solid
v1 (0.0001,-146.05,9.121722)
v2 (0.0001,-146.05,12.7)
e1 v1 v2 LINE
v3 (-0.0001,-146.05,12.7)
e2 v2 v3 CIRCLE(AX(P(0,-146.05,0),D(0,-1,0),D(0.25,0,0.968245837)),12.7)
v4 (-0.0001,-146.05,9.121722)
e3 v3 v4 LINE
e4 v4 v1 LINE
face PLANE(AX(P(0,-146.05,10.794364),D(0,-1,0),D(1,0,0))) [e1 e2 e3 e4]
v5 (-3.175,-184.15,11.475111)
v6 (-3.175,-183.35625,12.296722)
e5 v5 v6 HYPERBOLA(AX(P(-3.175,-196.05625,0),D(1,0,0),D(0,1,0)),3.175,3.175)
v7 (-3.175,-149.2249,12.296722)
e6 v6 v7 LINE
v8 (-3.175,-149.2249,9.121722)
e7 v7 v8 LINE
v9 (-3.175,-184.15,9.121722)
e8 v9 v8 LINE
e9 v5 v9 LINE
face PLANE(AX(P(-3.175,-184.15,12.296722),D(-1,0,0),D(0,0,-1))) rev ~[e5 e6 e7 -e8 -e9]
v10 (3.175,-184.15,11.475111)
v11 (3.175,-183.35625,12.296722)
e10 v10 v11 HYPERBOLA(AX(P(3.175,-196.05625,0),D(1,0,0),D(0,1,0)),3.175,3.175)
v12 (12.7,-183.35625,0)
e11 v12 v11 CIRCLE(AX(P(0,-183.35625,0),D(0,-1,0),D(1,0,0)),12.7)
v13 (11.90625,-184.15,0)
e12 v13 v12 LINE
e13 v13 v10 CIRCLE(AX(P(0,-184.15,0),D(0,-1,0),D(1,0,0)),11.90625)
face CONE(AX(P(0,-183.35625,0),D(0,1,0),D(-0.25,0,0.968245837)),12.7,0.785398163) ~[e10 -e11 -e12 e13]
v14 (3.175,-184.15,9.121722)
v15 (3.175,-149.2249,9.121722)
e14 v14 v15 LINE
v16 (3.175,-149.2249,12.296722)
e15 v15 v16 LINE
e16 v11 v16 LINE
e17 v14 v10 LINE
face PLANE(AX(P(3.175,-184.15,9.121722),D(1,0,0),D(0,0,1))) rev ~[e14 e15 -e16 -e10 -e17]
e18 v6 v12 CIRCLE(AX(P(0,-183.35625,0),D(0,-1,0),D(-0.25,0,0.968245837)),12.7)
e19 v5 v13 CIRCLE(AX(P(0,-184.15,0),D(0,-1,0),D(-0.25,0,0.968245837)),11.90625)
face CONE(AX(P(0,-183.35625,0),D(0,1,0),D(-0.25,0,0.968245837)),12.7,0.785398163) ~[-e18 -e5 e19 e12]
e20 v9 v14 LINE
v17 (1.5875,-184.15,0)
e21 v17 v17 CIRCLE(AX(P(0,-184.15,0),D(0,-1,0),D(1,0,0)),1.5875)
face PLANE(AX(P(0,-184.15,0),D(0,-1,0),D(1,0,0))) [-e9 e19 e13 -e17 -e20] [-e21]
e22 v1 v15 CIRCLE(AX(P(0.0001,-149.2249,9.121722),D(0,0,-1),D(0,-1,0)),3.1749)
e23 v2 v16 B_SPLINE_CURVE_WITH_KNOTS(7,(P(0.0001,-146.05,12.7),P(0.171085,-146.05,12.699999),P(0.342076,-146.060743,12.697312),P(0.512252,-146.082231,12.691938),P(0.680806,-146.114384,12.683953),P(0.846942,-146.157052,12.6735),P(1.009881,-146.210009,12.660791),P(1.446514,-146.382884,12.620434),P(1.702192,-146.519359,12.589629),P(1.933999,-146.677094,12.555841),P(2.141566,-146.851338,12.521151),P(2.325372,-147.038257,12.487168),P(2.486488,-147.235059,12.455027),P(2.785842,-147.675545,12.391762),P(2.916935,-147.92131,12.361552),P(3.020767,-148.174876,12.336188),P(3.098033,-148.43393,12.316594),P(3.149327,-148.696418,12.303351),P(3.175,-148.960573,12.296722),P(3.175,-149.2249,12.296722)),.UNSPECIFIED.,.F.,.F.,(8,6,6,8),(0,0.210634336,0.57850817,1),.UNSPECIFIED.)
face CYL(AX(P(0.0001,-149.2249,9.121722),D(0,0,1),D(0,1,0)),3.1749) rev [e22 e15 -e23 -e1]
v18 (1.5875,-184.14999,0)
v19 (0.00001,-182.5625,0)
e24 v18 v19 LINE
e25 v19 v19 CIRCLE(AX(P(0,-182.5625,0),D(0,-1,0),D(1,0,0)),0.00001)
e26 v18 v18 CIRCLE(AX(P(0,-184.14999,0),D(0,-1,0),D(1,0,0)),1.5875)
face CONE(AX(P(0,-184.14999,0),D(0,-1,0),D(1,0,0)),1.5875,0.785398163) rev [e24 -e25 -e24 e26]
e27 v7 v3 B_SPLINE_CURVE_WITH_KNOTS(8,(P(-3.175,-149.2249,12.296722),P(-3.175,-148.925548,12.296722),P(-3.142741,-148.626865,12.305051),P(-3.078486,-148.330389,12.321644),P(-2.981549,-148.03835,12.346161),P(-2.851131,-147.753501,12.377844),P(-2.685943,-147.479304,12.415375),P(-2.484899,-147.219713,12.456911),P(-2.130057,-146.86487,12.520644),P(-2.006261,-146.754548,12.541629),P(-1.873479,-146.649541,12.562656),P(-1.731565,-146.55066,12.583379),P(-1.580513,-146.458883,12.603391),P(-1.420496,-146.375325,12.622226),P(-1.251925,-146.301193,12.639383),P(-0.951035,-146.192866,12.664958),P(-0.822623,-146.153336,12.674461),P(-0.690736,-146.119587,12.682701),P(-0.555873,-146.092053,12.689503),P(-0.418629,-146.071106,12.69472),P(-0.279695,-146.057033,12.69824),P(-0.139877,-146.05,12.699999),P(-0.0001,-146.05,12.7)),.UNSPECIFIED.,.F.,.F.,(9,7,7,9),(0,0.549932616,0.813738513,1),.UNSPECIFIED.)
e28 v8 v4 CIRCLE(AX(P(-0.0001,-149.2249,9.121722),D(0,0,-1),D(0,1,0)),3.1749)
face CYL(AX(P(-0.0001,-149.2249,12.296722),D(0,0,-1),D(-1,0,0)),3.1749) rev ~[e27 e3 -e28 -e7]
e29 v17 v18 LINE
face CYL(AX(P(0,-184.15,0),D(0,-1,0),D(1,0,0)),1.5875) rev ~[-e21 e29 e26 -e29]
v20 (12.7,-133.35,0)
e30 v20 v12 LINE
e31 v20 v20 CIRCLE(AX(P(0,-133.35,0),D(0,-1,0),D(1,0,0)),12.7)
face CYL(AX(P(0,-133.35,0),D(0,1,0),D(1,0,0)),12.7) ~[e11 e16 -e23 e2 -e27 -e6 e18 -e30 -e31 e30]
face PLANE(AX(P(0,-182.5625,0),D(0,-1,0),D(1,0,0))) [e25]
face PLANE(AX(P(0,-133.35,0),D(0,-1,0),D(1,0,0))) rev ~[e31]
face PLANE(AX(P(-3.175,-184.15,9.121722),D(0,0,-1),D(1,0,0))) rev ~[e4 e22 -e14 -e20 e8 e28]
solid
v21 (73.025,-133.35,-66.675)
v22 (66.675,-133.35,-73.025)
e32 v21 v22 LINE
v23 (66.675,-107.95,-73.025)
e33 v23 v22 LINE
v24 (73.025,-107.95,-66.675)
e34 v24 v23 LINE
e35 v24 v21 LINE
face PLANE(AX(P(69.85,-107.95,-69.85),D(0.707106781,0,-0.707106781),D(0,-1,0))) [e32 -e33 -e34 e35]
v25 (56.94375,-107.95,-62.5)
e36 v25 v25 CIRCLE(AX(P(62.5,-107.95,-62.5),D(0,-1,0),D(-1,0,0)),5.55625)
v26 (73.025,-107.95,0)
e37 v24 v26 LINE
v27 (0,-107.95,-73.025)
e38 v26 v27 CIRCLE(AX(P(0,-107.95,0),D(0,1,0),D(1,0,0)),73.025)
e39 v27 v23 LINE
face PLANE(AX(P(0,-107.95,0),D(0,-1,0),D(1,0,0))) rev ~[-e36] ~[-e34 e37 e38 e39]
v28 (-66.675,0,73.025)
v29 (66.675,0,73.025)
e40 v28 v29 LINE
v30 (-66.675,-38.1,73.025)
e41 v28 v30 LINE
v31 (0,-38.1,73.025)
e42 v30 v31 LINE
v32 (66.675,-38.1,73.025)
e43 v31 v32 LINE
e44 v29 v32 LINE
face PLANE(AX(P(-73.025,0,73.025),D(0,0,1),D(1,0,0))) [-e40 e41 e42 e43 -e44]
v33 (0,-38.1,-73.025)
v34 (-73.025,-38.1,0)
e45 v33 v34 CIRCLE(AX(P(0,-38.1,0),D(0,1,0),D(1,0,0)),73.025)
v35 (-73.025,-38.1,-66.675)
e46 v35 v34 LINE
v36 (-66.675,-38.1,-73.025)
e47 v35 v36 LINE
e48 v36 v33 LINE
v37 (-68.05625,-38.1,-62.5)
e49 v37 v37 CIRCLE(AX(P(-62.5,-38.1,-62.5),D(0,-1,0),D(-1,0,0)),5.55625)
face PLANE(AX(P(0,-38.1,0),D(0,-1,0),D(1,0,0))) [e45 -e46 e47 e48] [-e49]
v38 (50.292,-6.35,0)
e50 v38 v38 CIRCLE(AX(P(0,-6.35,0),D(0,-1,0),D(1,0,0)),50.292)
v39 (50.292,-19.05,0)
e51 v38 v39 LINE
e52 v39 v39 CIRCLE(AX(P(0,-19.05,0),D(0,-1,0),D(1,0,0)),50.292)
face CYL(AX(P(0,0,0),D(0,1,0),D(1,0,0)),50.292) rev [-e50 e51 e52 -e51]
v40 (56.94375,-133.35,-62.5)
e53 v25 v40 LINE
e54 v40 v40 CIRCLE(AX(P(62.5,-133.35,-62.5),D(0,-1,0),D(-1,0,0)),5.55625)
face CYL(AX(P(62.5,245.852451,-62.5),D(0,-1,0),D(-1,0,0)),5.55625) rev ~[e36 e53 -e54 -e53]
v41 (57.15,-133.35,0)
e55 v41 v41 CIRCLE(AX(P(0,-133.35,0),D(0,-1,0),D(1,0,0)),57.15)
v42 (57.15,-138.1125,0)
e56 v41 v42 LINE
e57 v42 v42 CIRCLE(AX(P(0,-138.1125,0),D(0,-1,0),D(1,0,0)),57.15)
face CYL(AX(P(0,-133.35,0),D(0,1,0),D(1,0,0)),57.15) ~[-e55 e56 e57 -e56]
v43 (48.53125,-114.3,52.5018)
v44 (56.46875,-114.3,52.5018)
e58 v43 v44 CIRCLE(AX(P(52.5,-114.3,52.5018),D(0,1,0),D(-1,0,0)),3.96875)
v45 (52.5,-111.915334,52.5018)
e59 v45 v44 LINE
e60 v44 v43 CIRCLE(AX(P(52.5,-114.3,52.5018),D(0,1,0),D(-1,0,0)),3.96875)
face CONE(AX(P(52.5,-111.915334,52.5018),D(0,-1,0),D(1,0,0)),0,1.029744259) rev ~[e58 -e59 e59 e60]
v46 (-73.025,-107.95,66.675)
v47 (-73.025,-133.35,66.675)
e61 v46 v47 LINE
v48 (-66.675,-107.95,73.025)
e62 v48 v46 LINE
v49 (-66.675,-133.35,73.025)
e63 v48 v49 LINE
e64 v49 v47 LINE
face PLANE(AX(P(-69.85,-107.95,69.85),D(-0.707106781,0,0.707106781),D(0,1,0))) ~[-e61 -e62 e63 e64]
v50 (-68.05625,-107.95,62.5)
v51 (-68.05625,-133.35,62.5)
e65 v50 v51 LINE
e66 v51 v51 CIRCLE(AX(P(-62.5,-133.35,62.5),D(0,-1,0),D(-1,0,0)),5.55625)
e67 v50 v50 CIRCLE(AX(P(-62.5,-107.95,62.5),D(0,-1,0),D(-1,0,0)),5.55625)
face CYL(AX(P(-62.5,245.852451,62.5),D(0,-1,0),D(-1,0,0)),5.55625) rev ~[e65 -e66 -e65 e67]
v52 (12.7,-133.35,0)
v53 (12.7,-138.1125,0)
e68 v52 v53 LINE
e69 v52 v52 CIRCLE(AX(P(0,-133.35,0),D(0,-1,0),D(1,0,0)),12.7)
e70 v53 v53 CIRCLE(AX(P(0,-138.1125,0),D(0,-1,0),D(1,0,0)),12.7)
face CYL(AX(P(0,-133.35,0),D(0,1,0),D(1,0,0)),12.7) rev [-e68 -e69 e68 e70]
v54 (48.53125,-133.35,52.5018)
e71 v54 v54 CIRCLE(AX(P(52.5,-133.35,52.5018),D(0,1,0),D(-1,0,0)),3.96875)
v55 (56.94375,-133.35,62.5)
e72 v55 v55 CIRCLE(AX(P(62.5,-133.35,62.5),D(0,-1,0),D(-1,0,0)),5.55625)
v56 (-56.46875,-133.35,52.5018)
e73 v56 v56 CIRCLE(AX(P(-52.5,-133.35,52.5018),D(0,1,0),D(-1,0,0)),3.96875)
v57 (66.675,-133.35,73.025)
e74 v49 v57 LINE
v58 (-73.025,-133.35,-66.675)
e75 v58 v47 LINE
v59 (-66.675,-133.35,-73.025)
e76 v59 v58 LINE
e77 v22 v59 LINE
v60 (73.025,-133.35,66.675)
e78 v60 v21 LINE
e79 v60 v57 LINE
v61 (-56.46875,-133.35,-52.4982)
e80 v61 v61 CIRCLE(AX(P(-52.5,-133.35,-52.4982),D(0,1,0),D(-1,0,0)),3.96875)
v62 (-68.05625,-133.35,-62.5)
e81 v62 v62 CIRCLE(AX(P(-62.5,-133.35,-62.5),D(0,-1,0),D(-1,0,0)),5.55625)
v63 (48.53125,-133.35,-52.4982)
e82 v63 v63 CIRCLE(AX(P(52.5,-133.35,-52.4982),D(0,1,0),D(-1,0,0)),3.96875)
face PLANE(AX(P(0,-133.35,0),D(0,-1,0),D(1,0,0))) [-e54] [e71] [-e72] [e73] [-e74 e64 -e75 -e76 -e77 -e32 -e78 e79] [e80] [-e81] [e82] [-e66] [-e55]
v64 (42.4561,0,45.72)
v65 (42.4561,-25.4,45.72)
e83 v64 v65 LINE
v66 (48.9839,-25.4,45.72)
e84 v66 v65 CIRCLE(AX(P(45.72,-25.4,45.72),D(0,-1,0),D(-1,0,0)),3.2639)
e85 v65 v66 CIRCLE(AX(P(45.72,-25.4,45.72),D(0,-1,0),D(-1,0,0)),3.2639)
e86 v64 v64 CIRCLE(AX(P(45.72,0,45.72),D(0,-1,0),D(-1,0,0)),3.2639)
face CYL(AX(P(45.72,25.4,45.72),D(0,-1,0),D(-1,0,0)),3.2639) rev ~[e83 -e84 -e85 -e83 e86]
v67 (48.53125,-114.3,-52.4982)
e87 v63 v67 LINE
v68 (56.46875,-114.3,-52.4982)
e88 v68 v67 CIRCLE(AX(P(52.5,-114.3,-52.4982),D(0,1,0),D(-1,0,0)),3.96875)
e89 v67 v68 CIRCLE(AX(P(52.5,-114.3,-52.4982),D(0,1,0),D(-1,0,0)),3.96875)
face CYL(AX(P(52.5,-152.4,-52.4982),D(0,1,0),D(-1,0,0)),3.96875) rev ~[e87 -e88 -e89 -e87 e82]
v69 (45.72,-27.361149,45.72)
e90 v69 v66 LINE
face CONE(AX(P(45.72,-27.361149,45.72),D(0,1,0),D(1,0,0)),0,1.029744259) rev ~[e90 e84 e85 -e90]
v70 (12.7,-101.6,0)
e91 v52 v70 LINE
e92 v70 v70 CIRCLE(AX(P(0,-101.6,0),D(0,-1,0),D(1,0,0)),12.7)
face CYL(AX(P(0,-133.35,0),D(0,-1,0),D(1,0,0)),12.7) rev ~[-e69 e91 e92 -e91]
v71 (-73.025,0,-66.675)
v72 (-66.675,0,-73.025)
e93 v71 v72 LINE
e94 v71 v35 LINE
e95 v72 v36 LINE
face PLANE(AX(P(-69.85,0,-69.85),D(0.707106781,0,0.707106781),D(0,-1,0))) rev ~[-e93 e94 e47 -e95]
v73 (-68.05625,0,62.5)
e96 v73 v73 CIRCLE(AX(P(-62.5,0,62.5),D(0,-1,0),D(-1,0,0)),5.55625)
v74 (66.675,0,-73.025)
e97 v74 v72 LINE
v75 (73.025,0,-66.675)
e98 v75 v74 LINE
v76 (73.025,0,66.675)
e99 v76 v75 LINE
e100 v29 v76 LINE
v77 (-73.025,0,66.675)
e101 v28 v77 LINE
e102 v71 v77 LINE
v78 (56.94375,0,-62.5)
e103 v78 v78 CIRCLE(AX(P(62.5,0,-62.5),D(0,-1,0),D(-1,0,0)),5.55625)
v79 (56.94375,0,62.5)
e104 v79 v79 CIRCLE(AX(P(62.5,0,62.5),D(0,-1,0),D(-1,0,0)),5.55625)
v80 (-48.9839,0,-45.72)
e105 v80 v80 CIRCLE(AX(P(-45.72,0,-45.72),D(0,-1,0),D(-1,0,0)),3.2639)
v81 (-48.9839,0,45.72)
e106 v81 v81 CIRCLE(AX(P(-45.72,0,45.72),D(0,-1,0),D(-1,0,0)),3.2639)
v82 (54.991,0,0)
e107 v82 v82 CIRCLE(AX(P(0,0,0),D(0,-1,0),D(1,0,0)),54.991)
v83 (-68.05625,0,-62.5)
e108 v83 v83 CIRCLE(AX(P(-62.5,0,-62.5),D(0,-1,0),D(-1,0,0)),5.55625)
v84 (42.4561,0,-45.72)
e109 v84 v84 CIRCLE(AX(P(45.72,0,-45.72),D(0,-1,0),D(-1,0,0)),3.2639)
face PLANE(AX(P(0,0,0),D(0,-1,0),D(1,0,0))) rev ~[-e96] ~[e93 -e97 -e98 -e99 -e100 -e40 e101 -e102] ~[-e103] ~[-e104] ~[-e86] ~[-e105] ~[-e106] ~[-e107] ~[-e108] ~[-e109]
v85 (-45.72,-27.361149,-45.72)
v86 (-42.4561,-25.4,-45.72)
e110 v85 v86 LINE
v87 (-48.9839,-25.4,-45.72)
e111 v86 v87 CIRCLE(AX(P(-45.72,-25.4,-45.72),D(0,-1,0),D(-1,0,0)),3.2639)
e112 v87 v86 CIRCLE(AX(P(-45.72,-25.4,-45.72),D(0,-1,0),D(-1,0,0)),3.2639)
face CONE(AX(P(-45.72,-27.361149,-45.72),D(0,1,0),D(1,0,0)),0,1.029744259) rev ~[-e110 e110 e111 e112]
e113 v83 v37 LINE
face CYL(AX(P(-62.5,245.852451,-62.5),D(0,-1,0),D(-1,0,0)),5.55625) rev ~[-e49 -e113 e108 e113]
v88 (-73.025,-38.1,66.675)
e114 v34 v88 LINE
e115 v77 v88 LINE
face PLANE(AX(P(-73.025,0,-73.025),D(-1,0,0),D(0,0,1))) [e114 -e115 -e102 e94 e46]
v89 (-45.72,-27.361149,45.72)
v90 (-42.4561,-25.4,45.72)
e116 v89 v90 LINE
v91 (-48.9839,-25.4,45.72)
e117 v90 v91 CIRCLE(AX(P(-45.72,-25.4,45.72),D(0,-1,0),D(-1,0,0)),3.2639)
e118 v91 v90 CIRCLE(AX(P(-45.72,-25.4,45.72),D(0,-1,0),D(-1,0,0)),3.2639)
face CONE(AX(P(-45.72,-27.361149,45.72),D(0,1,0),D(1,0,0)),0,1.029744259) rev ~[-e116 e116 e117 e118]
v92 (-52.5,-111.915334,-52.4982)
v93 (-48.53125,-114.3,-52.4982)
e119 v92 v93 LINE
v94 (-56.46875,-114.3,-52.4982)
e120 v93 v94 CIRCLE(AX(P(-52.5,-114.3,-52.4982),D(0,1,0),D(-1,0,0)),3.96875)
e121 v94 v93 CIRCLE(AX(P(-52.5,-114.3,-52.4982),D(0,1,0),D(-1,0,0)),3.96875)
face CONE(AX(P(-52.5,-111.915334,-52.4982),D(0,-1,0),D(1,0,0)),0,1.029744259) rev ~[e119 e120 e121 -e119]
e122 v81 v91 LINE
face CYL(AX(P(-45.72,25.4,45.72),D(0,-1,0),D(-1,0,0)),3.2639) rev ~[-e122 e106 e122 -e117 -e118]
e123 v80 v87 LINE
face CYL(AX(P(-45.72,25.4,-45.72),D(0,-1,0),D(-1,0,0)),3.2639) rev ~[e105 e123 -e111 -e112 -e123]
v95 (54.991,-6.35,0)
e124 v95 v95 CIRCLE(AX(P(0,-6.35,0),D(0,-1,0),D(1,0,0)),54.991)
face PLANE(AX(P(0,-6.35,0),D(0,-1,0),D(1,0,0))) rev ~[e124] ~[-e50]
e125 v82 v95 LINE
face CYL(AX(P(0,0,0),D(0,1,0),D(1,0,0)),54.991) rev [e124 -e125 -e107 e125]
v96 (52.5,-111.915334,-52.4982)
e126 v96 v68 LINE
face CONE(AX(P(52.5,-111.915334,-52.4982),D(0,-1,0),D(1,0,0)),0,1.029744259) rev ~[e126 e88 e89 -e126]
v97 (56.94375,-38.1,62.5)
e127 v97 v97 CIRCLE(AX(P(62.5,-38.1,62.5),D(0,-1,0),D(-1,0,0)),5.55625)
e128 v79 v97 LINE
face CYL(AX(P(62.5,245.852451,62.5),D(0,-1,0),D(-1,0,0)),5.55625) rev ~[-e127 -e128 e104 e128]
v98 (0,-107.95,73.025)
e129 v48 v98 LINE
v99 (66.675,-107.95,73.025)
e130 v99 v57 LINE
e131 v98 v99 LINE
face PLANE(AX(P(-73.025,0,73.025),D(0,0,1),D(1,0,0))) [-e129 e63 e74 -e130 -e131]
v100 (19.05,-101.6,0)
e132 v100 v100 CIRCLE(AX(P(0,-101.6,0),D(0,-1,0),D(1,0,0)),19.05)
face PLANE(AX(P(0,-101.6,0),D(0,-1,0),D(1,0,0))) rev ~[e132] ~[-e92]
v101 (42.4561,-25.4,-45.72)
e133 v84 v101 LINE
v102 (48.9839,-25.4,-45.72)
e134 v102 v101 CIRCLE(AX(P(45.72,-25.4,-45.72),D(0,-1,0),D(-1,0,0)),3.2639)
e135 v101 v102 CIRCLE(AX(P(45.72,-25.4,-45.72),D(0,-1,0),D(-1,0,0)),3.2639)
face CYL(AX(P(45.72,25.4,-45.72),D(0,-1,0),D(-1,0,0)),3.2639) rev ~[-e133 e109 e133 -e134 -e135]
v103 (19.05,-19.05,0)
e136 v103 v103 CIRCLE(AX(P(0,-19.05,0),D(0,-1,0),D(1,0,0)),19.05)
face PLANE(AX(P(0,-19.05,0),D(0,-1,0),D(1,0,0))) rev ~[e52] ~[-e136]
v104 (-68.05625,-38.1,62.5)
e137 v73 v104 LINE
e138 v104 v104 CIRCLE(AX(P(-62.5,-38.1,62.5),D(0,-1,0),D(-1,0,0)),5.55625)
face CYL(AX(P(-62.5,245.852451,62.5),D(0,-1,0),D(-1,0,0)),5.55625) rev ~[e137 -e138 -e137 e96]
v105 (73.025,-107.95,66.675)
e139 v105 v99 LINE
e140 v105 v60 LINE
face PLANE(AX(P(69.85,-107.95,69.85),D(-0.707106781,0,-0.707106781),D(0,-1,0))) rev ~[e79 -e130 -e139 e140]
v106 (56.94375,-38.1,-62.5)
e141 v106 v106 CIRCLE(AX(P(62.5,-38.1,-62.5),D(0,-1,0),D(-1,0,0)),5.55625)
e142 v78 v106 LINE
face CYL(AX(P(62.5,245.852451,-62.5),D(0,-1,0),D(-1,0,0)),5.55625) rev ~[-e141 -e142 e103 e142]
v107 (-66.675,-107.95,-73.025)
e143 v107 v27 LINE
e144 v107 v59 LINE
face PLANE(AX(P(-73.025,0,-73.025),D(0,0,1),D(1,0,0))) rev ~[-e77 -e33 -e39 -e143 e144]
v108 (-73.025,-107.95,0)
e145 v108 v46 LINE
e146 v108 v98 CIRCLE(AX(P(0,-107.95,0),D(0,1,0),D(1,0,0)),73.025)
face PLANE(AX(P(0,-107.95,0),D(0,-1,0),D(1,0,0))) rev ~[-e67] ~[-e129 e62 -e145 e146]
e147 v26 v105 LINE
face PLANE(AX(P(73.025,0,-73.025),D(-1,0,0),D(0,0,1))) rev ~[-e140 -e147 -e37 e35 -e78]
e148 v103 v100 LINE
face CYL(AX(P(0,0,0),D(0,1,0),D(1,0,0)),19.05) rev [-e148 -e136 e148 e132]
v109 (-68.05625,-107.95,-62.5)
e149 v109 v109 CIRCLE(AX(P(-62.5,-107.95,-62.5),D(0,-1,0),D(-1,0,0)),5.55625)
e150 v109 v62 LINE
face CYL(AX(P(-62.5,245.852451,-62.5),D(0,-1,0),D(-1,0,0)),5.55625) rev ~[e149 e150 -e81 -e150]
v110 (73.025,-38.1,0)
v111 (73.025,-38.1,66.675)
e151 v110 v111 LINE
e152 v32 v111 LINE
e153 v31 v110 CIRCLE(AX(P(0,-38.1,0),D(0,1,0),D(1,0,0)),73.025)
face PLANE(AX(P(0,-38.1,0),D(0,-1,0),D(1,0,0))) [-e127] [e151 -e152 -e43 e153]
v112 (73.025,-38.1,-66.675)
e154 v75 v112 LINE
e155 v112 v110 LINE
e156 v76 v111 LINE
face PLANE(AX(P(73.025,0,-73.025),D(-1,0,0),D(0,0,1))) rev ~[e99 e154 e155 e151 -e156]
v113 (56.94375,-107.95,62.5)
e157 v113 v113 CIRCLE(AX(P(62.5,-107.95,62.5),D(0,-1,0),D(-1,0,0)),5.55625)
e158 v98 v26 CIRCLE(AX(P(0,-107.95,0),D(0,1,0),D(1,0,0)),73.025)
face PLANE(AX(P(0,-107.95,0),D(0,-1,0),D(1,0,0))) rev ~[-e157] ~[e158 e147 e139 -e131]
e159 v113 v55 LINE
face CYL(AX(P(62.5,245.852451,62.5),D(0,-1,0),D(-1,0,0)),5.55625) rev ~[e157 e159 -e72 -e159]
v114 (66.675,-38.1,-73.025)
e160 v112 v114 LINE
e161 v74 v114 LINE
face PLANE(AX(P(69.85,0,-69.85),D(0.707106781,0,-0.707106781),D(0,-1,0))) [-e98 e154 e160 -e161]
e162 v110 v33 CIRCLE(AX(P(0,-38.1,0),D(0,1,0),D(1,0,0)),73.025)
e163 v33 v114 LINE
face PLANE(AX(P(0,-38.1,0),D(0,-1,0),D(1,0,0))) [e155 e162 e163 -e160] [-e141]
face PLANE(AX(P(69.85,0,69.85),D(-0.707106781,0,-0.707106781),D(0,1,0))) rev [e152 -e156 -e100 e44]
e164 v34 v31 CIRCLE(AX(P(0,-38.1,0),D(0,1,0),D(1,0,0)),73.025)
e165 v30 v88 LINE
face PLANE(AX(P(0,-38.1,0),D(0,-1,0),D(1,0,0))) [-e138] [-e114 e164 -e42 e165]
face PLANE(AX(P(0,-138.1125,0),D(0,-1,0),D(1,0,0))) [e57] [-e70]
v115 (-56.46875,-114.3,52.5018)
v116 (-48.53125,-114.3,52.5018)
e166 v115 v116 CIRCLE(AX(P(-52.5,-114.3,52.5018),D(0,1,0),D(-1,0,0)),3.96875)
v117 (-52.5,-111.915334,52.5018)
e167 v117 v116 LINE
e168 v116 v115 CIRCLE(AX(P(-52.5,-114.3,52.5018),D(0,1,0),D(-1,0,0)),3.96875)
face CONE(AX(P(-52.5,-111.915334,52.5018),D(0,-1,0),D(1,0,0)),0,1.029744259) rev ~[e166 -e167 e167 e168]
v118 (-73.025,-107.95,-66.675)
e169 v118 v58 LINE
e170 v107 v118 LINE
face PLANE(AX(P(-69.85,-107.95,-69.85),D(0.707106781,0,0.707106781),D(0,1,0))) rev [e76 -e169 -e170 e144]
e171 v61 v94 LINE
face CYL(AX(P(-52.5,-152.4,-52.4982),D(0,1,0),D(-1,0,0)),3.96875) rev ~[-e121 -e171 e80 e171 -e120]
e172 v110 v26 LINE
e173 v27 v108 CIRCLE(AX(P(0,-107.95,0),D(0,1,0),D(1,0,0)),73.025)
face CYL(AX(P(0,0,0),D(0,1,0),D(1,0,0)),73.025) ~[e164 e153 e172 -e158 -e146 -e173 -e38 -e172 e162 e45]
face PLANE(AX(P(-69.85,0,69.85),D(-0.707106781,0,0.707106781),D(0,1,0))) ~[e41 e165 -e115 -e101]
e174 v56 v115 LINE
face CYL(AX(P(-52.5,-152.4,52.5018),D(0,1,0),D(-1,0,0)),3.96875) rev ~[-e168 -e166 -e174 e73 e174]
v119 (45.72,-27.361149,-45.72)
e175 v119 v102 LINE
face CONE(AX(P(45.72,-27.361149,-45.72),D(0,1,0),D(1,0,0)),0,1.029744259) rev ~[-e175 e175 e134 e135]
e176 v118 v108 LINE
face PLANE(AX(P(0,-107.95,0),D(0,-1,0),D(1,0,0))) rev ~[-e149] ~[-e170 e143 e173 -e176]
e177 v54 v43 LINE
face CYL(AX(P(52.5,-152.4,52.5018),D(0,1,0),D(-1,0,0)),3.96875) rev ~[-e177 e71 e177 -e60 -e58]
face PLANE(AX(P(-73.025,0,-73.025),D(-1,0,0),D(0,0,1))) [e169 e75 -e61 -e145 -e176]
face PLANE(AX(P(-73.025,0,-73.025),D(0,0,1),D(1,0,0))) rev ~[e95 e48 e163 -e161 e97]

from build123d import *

# Parameters (mm, degrees)
F0_W      = 146.05
F0_H      = 146.05
F1_DEPTH  = 133.35
F2_DEPTH  = 107.95
F3_DEPTH  = 38.1
F4_R      = 73.025
F5_DEPTH  = 133.35
F6_D      = 11.1125
F8_D      = 6.5278
F8_DEPTH  = 25.4
F8_TIP    = 1.9611489744
F7_R      = 50.292
F7_R_2    = 19.05
F9_DEPTH  = 19.05
F7_R_3    = 54.991
F10_DEPTH = 6.35
F11_DEPTH = 101.6
F12_R     = 12.7
F13_DEPTH = 133.351
F12_R_2   = 57.15
F14_DEPTH = 4.7625
F15_D     = 7.9375
F15_DEPTH = 19.05
F15_TIP   = 2.3846655818
F16_SIZE  = 6.35
F17_DEPTH = 50.8
F19_DEPTH = 38.1
F20_R     = 3.1749
F18_R     = 1.5875
F21_DEPTH = 1.5875
F22_SIZE  = 1.58749
F23_SIZE  = 0.79375


# Not quite as in the source:
# - a fillet or chamfer is up to 0.001 mm smaller than in the source, because OpenCascade refuses the exact size
# - a length typed as a fraction of an inch, garbled in the dataset ("3 / 203.2 mm" for 3/8 in), is restored


with BuildPart() as f1:
    # F0 (on Front) → F1 (new body)
    with BuildSketch(Plane.XZ):
        Rectangle(F0_W, F0_H)
    extrude(amount=F1_DEPTH)

    # F2 (cut): a face of the model
    f2_faces = [f1.faces().sort_by_distance(p)[0] for p in [
        (0, 0, 0),
    ]]
    extrude(f2_faces, amount=-F2_DEPTH, mode=Mode.SUBTRACT)



with BuildPart() as f3:
    # F0 (on Front) → F3 (new body)
    with BuildSketch(Plane.XZ):
        Rectangle(F0_W, F0_H)
    extrude(amount=F3_DEPTH)


with BuildPart() as f1_1:
    add(f1.part)

    add(f3.part)  # F5 merges F3
    # F4 (on face) → F5 (join, through all)
    with BuildSketch(Plane.XZ):
        Circle(F4_R)
    extrude(amount=F5_DEPTH)

    # F6 (through all)
    with Locations(Plane(origin=(0, 0, 0), x_dir=(1, 0, 0), z_dir=(0, 1, 0))):
        with Locations((62.5, -62.5), (-62.5, -62.5), (-62.5, 62.5), (62.5, 62.5)):
            Hole(F6_D / 2)

    # F8
    with Locations(Plane(origin=(0, 0, 0), x_dir=(1, 0, 0), z_dir=(0, 1, 0))):
        with Locations((-45.72, -45.72), (45.72, -45.72), (45.72, 45.72), (-45.72, 45.72)):
            Hole(F8_D / 2, depth=F8_DEPTH)
            with Locations((0, 0, -(F8_DEPTH + F8_TIP / 2))):  # 118° drill point
                Cone(0, F8_D / 2, F8_TIP, mode=Mode.SUBTRACT)

    # F7 (on face) → F9 (cut)
    with BuildSketch(Plane.XZ):
        Circle(F7_R)
        Circle(F7_R_2, mode=Mode.SUBTRACT)
    extrude(amount=F9_DEPTH, mode=Mode.SUBTRACT)

    # F7 (on face) → F10 (cut)
    with BuildSketch(Plane.XZ):
        Circle(F7_R_3)
        Circle(F7_R, mode=Mode.SUBTRACT)
    extrude(amount=F10_DEPTH, mode=Mode.SUBTRACT)

    # F7 (on face) → F11 (cut)
    with BuildSketch(Plane.XZ):
        Circle(F7_R_2)
    extrude(amount=F11_DEPTH, mode=Mode.SUBTRACT)

    # F12 (on face) → F13 (cut, through all)
    with BuildSketch(Plane.XZ.offset(133.35)):
        Circle(F12_R)
    extrude(amount=-F13_DEPTH, mode=Mode.SUBTRACT)

    # F12 (on face) → F14 (join)
    with BuildSketch(Plane.XZ.offset(133.35)):
        Circle(F12_R_2)
        Circle(F12_R, mode=Mode.SUBTRACT)
    extrude(amount=F14_DEPTH)

    # F15
    with Locations(Plane.XZ.offset(133.35)):
        with Locations((52.5, 52.5018), (52.5, -52.4982), (-52.5, -52.4982), (-52.5, 52.5018)):
            Hole(F15_D / 2, depth=F15_DEPTH)
            with Locations((0, 0, -(F15_DEPTH + F15_TIP / 2))):  # 118° drill point
                Cone(0, F15_D / 2, F15_TIP, mode=Mode.SUBTRACT)

    # F16
    f16_edges = [f1_1.edges().sort_by_distance(p)[0] for p in [
        (73.025, -19.05, 73.025),
        (73.025, -120.65, 73.025),
        (73.025, -19.05, -73.025),
        (73.025, -120.65, -73.025),
        (-73.025, -19.05, -73.025),
        (-73.025, -120.65, -73.025),
        (-73.025, -19.05, 73.025),
        (-73.025, -120.65, 73.025),
    ]]
    chamfer(f16_edges, length=F16_SIZE)


with BuildPart() as f17:
    # F12 (on face) → F17 (new body)
    with BuildSketch(Plane.XZ.offset(133.35)):
        Circle(F12_R)
    extrude(amount=F17_DEPTH)

    # F18 (on face) → F19 (cut)
    with BuildSketch(Plane.XZ.offset(184.15)):
        with BuildLine():
            Line((-3.175, 9.1217221242), (0, 9.1217221242))
            Line((0, 9.1217221242), (3.175, 9.1217221242))
            Line((3.175, 9.1217221242), (3.175, 12.2967221242))
            ThreePointArc((3.175, 12.2967221242), (0, 12.7), (-3.175, 12.2967221242))
            Line((-3.175, 12.2967221242), (-3.175, 9.1217221242))
        make_face()
    extrude(amount=-F19_DEPTH, mode=Mode.SUBTRACT)

    # F20 (radius 3.175 in the source; OpenCascade refuses exactly that, so slightly less here)
    f20_edges = [f17.edges().sort_by_distance(p)[0] for p in [
        (-3.175, -146.05, 10.709222),
        (3.175, -146.05, 10.709222),
    ]]
    fillet(f20_edges, radius=F20_R)

    # F18 (on face) → F21 (cut)
    with BuildSketch(Plane.XZ.offset(184.15)):
        Circle(F18_R)
    extrude(amount=-F21_DEPTH, mode=Mode.SUBTRACT)

    # F22 (size 1.5875 in the source; OpenCascade refuses exactly that, so slightly less here)
    f22_edges = [f17.edges().sort_by_distance(p)[0] for p in [
        (-1.5875, -182.5625, 0),
    ]]
    chamfer(f22_edges, length=F22_SIZE)

    # F23
    f23_edges = [f17.edges().sort_by_distance(p)[0] for p in [
        (-7.77713, -184.15, -10.040232),
    ]]
    chamfer(f23_edges, length=F23_SIZE)


solid = Compound([f1_1.part, f17.part])
